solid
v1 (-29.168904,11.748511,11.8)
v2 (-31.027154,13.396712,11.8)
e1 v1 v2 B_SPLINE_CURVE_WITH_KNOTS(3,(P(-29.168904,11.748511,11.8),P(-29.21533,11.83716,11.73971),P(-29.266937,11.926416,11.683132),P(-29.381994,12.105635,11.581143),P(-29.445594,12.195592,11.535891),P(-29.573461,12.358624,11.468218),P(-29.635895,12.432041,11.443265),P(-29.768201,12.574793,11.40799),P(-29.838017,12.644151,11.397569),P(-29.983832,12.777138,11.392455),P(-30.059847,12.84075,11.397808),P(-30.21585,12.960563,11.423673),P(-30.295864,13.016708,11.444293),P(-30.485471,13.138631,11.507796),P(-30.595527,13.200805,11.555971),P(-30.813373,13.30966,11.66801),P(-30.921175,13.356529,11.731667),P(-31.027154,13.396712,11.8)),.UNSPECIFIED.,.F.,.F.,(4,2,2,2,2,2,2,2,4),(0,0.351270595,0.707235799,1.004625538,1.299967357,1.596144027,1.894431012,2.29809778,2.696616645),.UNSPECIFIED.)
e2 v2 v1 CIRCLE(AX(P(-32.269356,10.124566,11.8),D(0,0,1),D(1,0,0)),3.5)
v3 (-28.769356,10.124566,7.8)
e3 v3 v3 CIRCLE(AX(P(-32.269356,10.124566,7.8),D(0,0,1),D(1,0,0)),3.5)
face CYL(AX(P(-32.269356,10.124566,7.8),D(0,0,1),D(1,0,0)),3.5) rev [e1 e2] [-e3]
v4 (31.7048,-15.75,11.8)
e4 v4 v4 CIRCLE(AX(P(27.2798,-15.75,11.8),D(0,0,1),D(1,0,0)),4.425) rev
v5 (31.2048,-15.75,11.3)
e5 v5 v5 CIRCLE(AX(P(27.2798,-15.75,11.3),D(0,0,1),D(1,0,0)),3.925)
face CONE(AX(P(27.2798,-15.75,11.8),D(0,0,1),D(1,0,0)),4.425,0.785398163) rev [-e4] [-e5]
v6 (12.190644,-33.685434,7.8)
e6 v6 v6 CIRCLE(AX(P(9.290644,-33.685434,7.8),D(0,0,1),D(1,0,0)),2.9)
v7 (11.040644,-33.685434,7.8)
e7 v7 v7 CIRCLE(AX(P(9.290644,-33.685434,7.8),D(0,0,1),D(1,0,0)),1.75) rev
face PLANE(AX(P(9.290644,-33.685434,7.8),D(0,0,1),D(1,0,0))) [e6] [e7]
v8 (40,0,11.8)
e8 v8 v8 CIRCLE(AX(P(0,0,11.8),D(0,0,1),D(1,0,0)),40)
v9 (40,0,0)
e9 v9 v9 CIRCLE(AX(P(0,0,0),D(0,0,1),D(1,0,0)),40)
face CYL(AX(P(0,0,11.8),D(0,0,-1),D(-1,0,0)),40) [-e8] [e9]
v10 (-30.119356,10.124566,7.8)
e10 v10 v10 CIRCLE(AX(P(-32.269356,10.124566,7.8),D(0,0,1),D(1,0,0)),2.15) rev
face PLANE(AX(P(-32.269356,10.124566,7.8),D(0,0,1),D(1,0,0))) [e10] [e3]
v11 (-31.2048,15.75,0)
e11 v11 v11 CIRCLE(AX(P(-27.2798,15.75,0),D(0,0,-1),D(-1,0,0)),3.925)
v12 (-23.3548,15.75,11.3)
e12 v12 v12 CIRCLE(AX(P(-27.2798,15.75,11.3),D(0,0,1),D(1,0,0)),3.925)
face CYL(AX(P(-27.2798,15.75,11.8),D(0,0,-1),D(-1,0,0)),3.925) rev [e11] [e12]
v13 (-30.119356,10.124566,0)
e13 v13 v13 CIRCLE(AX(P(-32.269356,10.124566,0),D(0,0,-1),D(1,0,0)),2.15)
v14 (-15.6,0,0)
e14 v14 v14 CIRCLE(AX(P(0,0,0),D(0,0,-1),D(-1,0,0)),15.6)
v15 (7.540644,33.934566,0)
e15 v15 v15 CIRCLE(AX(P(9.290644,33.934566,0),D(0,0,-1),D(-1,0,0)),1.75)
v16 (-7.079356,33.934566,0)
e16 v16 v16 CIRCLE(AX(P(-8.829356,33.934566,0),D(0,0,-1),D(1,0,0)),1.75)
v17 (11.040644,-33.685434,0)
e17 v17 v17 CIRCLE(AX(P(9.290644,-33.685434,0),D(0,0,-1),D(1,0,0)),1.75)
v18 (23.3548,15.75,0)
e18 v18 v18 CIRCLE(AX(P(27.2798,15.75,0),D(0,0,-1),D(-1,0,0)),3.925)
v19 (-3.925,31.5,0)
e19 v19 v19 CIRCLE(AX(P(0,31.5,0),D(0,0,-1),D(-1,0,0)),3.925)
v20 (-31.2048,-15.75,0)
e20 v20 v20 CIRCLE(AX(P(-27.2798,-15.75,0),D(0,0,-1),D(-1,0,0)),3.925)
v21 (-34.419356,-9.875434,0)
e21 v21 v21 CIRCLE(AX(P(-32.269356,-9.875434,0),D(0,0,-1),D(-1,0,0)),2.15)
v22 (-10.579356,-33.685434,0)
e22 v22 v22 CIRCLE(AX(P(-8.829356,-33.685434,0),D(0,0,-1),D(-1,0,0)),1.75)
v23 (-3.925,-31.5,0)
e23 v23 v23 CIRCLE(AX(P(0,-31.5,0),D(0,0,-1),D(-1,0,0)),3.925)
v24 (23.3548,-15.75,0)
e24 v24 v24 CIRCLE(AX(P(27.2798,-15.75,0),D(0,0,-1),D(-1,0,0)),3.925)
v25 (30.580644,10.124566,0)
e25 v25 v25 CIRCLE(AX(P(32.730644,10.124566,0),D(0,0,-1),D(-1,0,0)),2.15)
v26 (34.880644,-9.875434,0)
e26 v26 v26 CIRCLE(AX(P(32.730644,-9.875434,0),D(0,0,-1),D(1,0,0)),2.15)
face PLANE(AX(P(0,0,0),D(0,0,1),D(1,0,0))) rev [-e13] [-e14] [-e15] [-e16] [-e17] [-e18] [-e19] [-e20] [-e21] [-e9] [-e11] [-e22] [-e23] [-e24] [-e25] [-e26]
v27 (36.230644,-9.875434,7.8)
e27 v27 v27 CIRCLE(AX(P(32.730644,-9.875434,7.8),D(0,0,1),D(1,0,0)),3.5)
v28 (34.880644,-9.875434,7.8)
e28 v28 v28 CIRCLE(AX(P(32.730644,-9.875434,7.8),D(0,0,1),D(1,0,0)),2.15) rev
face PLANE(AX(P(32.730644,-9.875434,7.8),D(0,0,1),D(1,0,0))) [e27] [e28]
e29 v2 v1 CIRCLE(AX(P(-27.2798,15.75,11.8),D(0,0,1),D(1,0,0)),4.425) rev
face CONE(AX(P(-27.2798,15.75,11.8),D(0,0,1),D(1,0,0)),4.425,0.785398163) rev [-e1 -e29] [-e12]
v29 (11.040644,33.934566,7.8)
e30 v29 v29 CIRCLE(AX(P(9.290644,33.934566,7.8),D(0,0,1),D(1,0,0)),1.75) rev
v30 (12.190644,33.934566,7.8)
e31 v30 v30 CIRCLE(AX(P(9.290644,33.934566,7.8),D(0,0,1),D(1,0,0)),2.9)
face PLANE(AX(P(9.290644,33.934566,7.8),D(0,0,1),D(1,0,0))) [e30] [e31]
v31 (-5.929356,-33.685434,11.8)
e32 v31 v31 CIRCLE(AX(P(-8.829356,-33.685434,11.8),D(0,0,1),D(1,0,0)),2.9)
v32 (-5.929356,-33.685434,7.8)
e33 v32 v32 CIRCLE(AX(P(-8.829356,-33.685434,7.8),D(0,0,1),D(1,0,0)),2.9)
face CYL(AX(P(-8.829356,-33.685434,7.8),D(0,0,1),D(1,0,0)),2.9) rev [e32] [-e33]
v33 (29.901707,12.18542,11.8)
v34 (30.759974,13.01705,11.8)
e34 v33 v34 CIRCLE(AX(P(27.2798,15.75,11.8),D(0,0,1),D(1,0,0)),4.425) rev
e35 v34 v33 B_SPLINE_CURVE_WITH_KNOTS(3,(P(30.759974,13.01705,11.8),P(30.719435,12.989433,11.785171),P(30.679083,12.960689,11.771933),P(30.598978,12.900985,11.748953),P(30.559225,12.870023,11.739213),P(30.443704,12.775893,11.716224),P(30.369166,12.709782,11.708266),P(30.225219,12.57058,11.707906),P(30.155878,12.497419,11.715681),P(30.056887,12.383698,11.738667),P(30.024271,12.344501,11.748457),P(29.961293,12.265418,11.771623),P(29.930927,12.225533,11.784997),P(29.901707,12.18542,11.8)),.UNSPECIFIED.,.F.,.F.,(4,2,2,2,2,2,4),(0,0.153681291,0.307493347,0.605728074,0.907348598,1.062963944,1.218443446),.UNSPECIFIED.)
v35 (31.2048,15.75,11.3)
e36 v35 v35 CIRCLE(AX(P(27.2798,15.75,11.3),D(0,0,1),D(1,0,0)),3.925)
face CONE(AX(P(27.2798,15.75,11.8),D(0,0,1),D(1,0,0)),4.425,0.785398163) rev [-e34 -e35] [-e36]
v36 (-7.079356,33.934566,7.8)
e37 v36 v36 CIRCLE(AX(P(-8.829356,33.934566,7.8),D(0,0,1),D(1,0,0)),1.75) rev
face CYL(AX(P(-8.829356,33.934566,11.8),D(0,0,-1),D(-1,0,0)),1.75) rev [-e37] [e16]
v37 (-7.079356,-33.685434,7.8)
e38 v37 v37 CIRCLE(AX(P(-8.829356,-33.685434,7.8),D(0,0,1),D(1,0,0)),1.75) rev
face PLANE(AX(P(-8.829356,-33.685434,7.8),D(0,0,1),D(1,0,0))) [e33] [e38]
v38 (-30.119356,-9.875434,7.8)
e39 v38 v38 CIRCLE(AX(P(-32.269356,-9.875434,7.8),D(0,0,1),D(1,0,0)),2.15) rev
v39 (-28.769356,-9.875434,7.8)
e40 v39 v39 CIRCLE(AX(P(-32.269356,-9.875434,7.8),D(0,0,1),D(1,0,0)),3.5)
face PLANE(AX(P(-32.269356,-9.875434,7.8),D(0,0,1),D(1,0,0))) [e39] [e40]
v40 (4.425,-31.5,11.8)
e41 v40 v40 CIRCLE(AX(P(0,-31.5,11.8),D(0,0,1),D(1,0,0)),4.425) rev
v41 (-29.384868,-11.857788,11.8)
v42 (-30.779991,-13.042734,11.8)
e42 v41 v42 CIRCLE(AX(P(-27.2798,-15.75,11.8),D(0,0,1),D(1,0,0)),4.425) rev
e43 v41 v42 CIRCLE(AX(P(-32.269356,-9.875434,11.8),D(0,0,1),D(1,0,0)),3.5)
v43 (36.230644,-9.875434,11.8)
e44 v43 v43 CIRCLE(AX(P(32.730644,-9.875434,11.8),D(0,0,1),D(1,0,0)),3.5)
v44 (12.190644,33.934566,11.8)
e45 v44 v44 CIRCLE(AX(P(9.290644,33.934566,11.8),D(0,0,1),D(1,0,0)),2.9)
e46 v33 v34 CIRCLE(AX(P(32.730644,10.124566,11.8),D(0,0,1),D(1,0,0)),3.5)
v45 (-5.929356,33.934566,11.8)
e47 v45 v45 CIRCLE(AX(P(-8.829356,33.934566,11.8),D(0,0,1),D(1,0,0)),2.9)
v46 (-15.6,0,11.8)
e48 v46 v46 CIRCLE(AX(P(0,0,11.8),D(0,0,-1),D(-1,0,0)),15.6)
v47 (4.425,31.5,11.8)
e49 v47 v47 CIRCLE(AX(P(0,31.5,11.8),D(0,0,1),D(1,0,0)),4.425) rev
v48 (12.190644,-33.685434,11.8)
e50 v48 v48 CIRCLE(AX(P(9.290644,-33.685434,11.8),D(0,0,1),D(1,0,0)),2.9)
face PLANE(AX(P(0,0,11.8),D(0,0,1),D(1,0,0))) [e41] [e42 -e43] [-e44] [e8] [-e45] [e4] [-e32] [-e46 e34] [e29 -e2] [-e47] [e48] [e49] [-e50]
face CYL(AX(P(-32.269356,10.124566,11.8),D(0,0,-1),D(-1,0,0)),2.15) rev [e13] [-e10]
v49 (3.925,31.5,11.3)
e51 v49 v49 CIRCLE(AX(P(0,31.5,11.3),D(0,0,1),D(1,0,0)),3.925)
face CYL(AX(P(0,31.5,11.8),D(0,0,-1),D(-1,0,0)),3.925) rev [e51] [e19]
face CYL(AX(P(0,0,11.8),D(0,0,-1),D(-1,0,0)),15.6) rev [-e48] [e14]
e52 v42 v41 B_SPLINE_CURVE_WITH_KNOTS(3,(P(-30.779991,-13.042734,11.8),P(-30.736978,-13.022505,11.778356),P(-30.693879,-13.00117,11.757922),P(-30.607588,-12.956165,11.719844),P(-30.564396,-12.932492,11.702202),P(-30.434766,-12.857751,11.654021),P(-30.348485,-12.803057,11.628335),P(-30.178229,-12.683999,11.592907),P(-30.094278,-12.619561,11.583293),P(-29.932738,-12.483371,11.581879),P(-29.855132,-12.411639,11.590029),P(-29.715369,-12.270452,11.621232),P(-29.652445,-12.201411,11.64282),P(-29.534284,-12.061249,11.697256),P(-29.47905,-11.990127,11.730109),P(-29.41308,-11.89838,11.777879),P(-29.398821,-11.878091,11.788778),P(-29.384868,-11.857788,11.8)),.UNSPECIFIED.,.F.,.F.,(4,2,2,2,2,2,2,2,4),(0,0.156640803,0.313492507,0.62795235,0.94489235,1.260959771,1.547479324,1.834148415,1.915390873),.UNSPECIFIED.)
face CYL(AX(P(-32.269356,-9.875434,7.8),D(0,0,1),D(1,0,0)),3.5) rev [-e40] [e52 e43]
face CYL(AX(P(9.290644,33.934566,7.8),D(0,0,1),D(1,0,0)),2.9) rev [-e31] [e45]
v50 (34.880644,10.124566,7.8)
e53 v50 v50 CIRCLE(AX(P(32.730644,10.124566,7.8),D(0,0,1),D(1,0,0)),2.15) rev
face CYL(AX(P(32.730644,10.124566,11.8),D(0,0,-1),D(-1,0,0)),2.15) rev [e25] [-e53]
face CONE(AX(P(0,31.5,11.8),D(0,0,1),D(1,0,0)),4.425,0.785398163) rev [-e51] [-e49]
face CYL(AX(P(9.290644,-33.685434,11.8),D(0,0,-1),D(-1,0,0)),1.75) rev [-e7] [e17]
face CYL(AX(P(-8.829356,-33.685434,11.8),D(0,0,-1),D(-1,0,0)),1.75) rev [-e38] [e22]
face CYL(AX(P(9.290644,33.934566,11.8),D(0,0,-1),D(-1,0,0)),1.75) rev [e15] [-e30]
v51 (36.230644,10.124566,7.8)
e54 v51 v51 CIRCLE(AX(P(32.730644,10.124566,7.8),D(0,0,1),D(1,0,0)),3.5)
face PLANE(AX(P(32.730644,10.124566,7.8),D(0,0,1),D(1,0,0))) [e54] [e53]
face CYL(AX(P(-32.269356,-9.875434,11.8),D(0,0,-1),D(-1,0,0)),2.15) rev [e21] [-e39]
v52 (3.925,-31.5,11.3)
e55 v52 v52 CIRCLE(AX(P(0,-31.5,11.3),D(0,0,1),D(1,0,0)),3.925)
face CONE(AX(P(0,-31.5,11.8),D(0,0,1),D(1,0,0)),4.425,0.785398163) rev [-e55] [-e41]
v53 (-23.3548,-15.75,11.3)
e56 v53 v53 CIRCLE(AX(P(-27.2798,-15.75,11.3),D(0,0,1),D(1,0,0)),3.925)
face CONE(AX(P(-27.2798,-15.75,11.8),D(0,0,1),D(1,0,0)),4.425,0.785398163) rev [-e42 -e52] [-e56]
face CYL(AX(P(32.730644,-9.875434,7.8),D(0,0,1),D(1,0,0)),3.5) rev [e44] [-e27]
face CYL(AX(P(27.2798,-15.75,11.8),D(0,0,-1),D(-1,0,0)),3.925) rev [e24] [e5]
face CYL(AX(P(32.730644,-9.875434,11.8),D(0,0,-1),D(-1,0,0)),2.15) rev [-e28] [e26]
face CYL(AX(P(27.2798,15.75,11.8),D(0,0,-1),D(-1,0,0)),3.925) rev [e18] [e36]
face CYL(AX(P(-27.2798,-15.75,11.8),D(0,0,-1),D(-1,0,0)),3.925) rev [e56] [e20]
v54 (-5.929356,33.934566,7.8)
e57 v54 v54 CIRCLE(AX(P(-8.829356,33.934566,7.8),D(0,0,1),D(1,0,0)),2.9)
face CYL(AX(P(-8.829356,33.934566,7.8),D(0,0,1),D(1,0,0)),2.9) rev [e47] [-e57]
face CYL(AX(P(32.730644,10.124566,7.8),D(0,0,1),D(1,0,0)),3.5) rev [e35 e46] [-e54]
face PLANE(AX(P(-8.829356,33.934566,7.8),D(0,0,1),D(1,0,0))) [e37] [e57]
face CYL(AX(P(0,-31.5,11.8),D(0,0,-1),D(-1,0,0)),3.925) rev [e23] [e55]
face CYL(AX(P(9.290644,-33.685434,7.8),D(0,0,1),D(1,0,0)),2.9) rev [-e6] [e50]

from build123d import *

# Parameters (mm, degrees)
SKETCH_1_R          = 40
EXTRUDE_1_DEPTH     = 11.8
SKETCH_2_R          = 2.15
SKETCH_2_R_2        = 1.75
CUT_EXTRUDE_1_DEPTH = 58.786157512
SKETCH_3_R          = 3.925
SKETCH_3_R_2        = 15.6
CUT_EXTRUDE_2_DEPTH = 58.786157512
SKETCH_5_R          = 2.9
SKETCH_5_R_2        = 3.5
CUT_EXTRUDE_4_DEPTH = 4
CHAMFER_1_SIZE      = 0.5


with BuildPart() as part:
    # 草图1 → 凸台-拉伸1 (new body)
    with BuildSketch(Plane.XY):
        Circle(SKETCH_1_R)
    extrude(amount=EXTRUDE_1_DEPTH)

    # 草图2 → 切除-拉伸1 (cut, through all)
    with BuildSketch(Plane(origin=(0, 0, 0), x_dir=(-1, 0, 0), z_dir=(0, 0, -1))):
        with Locations((-32.730643847, 10.1245665)):
            Circle(SKETCH_2_R)
        with Locations(Location((-32.730643847, -9.8754335, 0), (0, 0, 180))):
            Circle(SKETCH_2_R)
        with Locations((32.269356153, -9.8754335)):
            Circle(SKETCH_2_R)
        with Locations(Location((32.269356153, 10.1245665, 0), (0, 0, 180))):
            Circle(SKETCH_2_R)
        with Locations((-9.290643847, 33.9345665)):
            Circle(SKETCH_2_R_2)
        with Locations(Location((8.829356153, 33.9345665, 0), (0, 0, 180))):
            Circle(SKETCH_2_R_2)
        with Locations((8.829356153, -33.6854335)):
            Circle(SKETCH_2_R_2)
        with Locations(Location((-9.290643847, -33.6854335, 0), (0, 0, 180))):
            Circle(SKETCH_2_R_2)
    extrude(amount=-CUT_EXTRUDE_1_DEPTH, mode=Mode.SUBTRACT)

    # 草图3 → 切除-拉伸2 (cut, through all)
    with BuildSketch(Plane(origin=(0, 0, 0), x_dir=(-1, 0, 0), z_dir=(0, 0, -1))):
        with Locations((0, 31.5)):
            Circle(SKETCH_3_R)
        with Locations((27.279800219, 15.75)):
            Circle(SKETCH_3_R)
        with Locations((27.279800219, -15.75)):
            Circle(SKETCH_3_R)
        with Locations((0, -31.5)):
            Circle(SKETCH_3_R)
        with Locations((-27.279800219, -15.75)):
            Circle(SKETCH_3_R)
        with Locations((-27.279800219, 15.75)):
            Circle(SKETCH_3_R)
        Circle(SKETCH_3_R_2)
    extrude(amount=-CUT_EXTRUDE_2_DEPTH, mode=Mode.SUBTRACT)

    # 草图5 → 切除-拉伸4 (cut)
    with BuildSketch(Plane.XY.offset(11.8)):
        with Locations((-8.829356153, -33.6854335)):
            Circle(SKETCH_5_R)
        with Locations((-8.829356153, 33.9345665)):
            Circle(SKETCH_5_R)
        with Locations((-32.269356153, 10.1245665)):
            Circle(SKETCH_5_R_2)
        with Locations((-32.269356153, -9.8754335)):
            Circle(SKETCH_5_R_2)
        with Locations((9.290643847, 33.9345665)):
            Circle(SKETCH_5_R)
        with Locations((32.730643847, 10.1245665)):
            Circle(SKETCH_5_R_2)
        with Locations((32.730643847, -9.8754335)):
            Circle(SKETCH_5_R_2)
        with Locations((9.290643847, -33.6854335)):
            Circle(SKETCH_5_R)
    extrude(amount=-CUT_EXTRUDE_4_DEPTH, mode=Mode.SUBTRACT)

    # 倒角1
    # the kernel refuses this chamfer: 0.5 mm, written as the material it takes off along each edge
    with BuildSketch(Plane(origin=(0, 31.5, 11.8), x_dir=(-1, 0, 0), z_dir=(0, -1, 0))) as chamfer_1_piece_1:
        Polygon((3.925 + CHAMFER_1_SIZE, 0), (3.925, CHAMFER_1_SIZE), (3.925, 0), align=None)
    revolve(axis=Axis((0, 31.5, 11.8), (0, 0, -1)), mode=Mode.SUBTRACT)
    with BuildSketch(Plane(origin=(0, -31.5, 11.8), x_dir=(-1, 0, 0), z_dir=(0, -1, 0))) as chamfer_1_piece_2:
        Polygon((3.925 + CHAMFER_1_SIZE, 0), (3.925, CHAMFER_1_SIZE), (3.925, 0), align=None)
    revolve(axis=Axis((0, -31.5, 11.8), (0, 0, -1)), mode=Mode.SUBTRACT)
    with BuildSketch(Plane(origin=(-27.279800219, -15.75, 11.8), x_dir=(-1, 0, 0), z_dir=(0, -1, 0))) as chamfer_1_piece_3:
        Polygon((3.925 + CHAMFER_1_SIZE, 0), (3.925, CHAMFER_1_SIZE), (3.925, 0), align=None)
    revolve(axis=Axis((-27.279800219, -15.75, 11.8), (0, 0, -1)), mode=Mode.SUBTRACT)
    with BuildSketch(Plane(origin=(-27.279800219, 15.75, 11.8), x_dir=(-1, 0, 0), z_dir=(0, -1, 0))) as chamfer_1_piece_4:
        Polygon((3.925 + CHAMFER_1_SIZE, 0), (3.925, CHAMFER_1_SIZE), (3.925, 0), align=None)
    revolve(axis=Axis((-27.279800219, 15.75, 11.8), (0, 0, -1)), mode=Mode.SUBTRACT)
    with BuildSketch(Plane(origin=(27.279800219, -15.75, 11.8), x_dir=(-1, 0, 0), z_dir=(0, -1, 0))) as chamfer_1_piece_5:
        Polygon((3.925 + CHAMFER_1_SIZE, 0), (3.925, CHAMFER_1_SIZE), (3.925, 0), align=None)
    revolve(axis=Axis((27.279800219, -15.75, 11.8), (0, 0, -1)), mode=Mode.SUBTRACT)
    with BuildSketch(Plane(origin=(27.279800219, 15.75, 11.8), x_dir=(-1, 0, 0), z_dir=(0, -1, 0))) as chamfer_1_piece_6:
        Polygon((3.925 + CHAMFER_1_SIZE, 0), (3.925, CHAMFER_1_SIZE), (3.925, 0), align=None)
    revolve(axis=Axis((27.279800219, 15.75, 11.8), (0, 0, -1)), mode=Mode.SUBTRACT)


solid = part.part
